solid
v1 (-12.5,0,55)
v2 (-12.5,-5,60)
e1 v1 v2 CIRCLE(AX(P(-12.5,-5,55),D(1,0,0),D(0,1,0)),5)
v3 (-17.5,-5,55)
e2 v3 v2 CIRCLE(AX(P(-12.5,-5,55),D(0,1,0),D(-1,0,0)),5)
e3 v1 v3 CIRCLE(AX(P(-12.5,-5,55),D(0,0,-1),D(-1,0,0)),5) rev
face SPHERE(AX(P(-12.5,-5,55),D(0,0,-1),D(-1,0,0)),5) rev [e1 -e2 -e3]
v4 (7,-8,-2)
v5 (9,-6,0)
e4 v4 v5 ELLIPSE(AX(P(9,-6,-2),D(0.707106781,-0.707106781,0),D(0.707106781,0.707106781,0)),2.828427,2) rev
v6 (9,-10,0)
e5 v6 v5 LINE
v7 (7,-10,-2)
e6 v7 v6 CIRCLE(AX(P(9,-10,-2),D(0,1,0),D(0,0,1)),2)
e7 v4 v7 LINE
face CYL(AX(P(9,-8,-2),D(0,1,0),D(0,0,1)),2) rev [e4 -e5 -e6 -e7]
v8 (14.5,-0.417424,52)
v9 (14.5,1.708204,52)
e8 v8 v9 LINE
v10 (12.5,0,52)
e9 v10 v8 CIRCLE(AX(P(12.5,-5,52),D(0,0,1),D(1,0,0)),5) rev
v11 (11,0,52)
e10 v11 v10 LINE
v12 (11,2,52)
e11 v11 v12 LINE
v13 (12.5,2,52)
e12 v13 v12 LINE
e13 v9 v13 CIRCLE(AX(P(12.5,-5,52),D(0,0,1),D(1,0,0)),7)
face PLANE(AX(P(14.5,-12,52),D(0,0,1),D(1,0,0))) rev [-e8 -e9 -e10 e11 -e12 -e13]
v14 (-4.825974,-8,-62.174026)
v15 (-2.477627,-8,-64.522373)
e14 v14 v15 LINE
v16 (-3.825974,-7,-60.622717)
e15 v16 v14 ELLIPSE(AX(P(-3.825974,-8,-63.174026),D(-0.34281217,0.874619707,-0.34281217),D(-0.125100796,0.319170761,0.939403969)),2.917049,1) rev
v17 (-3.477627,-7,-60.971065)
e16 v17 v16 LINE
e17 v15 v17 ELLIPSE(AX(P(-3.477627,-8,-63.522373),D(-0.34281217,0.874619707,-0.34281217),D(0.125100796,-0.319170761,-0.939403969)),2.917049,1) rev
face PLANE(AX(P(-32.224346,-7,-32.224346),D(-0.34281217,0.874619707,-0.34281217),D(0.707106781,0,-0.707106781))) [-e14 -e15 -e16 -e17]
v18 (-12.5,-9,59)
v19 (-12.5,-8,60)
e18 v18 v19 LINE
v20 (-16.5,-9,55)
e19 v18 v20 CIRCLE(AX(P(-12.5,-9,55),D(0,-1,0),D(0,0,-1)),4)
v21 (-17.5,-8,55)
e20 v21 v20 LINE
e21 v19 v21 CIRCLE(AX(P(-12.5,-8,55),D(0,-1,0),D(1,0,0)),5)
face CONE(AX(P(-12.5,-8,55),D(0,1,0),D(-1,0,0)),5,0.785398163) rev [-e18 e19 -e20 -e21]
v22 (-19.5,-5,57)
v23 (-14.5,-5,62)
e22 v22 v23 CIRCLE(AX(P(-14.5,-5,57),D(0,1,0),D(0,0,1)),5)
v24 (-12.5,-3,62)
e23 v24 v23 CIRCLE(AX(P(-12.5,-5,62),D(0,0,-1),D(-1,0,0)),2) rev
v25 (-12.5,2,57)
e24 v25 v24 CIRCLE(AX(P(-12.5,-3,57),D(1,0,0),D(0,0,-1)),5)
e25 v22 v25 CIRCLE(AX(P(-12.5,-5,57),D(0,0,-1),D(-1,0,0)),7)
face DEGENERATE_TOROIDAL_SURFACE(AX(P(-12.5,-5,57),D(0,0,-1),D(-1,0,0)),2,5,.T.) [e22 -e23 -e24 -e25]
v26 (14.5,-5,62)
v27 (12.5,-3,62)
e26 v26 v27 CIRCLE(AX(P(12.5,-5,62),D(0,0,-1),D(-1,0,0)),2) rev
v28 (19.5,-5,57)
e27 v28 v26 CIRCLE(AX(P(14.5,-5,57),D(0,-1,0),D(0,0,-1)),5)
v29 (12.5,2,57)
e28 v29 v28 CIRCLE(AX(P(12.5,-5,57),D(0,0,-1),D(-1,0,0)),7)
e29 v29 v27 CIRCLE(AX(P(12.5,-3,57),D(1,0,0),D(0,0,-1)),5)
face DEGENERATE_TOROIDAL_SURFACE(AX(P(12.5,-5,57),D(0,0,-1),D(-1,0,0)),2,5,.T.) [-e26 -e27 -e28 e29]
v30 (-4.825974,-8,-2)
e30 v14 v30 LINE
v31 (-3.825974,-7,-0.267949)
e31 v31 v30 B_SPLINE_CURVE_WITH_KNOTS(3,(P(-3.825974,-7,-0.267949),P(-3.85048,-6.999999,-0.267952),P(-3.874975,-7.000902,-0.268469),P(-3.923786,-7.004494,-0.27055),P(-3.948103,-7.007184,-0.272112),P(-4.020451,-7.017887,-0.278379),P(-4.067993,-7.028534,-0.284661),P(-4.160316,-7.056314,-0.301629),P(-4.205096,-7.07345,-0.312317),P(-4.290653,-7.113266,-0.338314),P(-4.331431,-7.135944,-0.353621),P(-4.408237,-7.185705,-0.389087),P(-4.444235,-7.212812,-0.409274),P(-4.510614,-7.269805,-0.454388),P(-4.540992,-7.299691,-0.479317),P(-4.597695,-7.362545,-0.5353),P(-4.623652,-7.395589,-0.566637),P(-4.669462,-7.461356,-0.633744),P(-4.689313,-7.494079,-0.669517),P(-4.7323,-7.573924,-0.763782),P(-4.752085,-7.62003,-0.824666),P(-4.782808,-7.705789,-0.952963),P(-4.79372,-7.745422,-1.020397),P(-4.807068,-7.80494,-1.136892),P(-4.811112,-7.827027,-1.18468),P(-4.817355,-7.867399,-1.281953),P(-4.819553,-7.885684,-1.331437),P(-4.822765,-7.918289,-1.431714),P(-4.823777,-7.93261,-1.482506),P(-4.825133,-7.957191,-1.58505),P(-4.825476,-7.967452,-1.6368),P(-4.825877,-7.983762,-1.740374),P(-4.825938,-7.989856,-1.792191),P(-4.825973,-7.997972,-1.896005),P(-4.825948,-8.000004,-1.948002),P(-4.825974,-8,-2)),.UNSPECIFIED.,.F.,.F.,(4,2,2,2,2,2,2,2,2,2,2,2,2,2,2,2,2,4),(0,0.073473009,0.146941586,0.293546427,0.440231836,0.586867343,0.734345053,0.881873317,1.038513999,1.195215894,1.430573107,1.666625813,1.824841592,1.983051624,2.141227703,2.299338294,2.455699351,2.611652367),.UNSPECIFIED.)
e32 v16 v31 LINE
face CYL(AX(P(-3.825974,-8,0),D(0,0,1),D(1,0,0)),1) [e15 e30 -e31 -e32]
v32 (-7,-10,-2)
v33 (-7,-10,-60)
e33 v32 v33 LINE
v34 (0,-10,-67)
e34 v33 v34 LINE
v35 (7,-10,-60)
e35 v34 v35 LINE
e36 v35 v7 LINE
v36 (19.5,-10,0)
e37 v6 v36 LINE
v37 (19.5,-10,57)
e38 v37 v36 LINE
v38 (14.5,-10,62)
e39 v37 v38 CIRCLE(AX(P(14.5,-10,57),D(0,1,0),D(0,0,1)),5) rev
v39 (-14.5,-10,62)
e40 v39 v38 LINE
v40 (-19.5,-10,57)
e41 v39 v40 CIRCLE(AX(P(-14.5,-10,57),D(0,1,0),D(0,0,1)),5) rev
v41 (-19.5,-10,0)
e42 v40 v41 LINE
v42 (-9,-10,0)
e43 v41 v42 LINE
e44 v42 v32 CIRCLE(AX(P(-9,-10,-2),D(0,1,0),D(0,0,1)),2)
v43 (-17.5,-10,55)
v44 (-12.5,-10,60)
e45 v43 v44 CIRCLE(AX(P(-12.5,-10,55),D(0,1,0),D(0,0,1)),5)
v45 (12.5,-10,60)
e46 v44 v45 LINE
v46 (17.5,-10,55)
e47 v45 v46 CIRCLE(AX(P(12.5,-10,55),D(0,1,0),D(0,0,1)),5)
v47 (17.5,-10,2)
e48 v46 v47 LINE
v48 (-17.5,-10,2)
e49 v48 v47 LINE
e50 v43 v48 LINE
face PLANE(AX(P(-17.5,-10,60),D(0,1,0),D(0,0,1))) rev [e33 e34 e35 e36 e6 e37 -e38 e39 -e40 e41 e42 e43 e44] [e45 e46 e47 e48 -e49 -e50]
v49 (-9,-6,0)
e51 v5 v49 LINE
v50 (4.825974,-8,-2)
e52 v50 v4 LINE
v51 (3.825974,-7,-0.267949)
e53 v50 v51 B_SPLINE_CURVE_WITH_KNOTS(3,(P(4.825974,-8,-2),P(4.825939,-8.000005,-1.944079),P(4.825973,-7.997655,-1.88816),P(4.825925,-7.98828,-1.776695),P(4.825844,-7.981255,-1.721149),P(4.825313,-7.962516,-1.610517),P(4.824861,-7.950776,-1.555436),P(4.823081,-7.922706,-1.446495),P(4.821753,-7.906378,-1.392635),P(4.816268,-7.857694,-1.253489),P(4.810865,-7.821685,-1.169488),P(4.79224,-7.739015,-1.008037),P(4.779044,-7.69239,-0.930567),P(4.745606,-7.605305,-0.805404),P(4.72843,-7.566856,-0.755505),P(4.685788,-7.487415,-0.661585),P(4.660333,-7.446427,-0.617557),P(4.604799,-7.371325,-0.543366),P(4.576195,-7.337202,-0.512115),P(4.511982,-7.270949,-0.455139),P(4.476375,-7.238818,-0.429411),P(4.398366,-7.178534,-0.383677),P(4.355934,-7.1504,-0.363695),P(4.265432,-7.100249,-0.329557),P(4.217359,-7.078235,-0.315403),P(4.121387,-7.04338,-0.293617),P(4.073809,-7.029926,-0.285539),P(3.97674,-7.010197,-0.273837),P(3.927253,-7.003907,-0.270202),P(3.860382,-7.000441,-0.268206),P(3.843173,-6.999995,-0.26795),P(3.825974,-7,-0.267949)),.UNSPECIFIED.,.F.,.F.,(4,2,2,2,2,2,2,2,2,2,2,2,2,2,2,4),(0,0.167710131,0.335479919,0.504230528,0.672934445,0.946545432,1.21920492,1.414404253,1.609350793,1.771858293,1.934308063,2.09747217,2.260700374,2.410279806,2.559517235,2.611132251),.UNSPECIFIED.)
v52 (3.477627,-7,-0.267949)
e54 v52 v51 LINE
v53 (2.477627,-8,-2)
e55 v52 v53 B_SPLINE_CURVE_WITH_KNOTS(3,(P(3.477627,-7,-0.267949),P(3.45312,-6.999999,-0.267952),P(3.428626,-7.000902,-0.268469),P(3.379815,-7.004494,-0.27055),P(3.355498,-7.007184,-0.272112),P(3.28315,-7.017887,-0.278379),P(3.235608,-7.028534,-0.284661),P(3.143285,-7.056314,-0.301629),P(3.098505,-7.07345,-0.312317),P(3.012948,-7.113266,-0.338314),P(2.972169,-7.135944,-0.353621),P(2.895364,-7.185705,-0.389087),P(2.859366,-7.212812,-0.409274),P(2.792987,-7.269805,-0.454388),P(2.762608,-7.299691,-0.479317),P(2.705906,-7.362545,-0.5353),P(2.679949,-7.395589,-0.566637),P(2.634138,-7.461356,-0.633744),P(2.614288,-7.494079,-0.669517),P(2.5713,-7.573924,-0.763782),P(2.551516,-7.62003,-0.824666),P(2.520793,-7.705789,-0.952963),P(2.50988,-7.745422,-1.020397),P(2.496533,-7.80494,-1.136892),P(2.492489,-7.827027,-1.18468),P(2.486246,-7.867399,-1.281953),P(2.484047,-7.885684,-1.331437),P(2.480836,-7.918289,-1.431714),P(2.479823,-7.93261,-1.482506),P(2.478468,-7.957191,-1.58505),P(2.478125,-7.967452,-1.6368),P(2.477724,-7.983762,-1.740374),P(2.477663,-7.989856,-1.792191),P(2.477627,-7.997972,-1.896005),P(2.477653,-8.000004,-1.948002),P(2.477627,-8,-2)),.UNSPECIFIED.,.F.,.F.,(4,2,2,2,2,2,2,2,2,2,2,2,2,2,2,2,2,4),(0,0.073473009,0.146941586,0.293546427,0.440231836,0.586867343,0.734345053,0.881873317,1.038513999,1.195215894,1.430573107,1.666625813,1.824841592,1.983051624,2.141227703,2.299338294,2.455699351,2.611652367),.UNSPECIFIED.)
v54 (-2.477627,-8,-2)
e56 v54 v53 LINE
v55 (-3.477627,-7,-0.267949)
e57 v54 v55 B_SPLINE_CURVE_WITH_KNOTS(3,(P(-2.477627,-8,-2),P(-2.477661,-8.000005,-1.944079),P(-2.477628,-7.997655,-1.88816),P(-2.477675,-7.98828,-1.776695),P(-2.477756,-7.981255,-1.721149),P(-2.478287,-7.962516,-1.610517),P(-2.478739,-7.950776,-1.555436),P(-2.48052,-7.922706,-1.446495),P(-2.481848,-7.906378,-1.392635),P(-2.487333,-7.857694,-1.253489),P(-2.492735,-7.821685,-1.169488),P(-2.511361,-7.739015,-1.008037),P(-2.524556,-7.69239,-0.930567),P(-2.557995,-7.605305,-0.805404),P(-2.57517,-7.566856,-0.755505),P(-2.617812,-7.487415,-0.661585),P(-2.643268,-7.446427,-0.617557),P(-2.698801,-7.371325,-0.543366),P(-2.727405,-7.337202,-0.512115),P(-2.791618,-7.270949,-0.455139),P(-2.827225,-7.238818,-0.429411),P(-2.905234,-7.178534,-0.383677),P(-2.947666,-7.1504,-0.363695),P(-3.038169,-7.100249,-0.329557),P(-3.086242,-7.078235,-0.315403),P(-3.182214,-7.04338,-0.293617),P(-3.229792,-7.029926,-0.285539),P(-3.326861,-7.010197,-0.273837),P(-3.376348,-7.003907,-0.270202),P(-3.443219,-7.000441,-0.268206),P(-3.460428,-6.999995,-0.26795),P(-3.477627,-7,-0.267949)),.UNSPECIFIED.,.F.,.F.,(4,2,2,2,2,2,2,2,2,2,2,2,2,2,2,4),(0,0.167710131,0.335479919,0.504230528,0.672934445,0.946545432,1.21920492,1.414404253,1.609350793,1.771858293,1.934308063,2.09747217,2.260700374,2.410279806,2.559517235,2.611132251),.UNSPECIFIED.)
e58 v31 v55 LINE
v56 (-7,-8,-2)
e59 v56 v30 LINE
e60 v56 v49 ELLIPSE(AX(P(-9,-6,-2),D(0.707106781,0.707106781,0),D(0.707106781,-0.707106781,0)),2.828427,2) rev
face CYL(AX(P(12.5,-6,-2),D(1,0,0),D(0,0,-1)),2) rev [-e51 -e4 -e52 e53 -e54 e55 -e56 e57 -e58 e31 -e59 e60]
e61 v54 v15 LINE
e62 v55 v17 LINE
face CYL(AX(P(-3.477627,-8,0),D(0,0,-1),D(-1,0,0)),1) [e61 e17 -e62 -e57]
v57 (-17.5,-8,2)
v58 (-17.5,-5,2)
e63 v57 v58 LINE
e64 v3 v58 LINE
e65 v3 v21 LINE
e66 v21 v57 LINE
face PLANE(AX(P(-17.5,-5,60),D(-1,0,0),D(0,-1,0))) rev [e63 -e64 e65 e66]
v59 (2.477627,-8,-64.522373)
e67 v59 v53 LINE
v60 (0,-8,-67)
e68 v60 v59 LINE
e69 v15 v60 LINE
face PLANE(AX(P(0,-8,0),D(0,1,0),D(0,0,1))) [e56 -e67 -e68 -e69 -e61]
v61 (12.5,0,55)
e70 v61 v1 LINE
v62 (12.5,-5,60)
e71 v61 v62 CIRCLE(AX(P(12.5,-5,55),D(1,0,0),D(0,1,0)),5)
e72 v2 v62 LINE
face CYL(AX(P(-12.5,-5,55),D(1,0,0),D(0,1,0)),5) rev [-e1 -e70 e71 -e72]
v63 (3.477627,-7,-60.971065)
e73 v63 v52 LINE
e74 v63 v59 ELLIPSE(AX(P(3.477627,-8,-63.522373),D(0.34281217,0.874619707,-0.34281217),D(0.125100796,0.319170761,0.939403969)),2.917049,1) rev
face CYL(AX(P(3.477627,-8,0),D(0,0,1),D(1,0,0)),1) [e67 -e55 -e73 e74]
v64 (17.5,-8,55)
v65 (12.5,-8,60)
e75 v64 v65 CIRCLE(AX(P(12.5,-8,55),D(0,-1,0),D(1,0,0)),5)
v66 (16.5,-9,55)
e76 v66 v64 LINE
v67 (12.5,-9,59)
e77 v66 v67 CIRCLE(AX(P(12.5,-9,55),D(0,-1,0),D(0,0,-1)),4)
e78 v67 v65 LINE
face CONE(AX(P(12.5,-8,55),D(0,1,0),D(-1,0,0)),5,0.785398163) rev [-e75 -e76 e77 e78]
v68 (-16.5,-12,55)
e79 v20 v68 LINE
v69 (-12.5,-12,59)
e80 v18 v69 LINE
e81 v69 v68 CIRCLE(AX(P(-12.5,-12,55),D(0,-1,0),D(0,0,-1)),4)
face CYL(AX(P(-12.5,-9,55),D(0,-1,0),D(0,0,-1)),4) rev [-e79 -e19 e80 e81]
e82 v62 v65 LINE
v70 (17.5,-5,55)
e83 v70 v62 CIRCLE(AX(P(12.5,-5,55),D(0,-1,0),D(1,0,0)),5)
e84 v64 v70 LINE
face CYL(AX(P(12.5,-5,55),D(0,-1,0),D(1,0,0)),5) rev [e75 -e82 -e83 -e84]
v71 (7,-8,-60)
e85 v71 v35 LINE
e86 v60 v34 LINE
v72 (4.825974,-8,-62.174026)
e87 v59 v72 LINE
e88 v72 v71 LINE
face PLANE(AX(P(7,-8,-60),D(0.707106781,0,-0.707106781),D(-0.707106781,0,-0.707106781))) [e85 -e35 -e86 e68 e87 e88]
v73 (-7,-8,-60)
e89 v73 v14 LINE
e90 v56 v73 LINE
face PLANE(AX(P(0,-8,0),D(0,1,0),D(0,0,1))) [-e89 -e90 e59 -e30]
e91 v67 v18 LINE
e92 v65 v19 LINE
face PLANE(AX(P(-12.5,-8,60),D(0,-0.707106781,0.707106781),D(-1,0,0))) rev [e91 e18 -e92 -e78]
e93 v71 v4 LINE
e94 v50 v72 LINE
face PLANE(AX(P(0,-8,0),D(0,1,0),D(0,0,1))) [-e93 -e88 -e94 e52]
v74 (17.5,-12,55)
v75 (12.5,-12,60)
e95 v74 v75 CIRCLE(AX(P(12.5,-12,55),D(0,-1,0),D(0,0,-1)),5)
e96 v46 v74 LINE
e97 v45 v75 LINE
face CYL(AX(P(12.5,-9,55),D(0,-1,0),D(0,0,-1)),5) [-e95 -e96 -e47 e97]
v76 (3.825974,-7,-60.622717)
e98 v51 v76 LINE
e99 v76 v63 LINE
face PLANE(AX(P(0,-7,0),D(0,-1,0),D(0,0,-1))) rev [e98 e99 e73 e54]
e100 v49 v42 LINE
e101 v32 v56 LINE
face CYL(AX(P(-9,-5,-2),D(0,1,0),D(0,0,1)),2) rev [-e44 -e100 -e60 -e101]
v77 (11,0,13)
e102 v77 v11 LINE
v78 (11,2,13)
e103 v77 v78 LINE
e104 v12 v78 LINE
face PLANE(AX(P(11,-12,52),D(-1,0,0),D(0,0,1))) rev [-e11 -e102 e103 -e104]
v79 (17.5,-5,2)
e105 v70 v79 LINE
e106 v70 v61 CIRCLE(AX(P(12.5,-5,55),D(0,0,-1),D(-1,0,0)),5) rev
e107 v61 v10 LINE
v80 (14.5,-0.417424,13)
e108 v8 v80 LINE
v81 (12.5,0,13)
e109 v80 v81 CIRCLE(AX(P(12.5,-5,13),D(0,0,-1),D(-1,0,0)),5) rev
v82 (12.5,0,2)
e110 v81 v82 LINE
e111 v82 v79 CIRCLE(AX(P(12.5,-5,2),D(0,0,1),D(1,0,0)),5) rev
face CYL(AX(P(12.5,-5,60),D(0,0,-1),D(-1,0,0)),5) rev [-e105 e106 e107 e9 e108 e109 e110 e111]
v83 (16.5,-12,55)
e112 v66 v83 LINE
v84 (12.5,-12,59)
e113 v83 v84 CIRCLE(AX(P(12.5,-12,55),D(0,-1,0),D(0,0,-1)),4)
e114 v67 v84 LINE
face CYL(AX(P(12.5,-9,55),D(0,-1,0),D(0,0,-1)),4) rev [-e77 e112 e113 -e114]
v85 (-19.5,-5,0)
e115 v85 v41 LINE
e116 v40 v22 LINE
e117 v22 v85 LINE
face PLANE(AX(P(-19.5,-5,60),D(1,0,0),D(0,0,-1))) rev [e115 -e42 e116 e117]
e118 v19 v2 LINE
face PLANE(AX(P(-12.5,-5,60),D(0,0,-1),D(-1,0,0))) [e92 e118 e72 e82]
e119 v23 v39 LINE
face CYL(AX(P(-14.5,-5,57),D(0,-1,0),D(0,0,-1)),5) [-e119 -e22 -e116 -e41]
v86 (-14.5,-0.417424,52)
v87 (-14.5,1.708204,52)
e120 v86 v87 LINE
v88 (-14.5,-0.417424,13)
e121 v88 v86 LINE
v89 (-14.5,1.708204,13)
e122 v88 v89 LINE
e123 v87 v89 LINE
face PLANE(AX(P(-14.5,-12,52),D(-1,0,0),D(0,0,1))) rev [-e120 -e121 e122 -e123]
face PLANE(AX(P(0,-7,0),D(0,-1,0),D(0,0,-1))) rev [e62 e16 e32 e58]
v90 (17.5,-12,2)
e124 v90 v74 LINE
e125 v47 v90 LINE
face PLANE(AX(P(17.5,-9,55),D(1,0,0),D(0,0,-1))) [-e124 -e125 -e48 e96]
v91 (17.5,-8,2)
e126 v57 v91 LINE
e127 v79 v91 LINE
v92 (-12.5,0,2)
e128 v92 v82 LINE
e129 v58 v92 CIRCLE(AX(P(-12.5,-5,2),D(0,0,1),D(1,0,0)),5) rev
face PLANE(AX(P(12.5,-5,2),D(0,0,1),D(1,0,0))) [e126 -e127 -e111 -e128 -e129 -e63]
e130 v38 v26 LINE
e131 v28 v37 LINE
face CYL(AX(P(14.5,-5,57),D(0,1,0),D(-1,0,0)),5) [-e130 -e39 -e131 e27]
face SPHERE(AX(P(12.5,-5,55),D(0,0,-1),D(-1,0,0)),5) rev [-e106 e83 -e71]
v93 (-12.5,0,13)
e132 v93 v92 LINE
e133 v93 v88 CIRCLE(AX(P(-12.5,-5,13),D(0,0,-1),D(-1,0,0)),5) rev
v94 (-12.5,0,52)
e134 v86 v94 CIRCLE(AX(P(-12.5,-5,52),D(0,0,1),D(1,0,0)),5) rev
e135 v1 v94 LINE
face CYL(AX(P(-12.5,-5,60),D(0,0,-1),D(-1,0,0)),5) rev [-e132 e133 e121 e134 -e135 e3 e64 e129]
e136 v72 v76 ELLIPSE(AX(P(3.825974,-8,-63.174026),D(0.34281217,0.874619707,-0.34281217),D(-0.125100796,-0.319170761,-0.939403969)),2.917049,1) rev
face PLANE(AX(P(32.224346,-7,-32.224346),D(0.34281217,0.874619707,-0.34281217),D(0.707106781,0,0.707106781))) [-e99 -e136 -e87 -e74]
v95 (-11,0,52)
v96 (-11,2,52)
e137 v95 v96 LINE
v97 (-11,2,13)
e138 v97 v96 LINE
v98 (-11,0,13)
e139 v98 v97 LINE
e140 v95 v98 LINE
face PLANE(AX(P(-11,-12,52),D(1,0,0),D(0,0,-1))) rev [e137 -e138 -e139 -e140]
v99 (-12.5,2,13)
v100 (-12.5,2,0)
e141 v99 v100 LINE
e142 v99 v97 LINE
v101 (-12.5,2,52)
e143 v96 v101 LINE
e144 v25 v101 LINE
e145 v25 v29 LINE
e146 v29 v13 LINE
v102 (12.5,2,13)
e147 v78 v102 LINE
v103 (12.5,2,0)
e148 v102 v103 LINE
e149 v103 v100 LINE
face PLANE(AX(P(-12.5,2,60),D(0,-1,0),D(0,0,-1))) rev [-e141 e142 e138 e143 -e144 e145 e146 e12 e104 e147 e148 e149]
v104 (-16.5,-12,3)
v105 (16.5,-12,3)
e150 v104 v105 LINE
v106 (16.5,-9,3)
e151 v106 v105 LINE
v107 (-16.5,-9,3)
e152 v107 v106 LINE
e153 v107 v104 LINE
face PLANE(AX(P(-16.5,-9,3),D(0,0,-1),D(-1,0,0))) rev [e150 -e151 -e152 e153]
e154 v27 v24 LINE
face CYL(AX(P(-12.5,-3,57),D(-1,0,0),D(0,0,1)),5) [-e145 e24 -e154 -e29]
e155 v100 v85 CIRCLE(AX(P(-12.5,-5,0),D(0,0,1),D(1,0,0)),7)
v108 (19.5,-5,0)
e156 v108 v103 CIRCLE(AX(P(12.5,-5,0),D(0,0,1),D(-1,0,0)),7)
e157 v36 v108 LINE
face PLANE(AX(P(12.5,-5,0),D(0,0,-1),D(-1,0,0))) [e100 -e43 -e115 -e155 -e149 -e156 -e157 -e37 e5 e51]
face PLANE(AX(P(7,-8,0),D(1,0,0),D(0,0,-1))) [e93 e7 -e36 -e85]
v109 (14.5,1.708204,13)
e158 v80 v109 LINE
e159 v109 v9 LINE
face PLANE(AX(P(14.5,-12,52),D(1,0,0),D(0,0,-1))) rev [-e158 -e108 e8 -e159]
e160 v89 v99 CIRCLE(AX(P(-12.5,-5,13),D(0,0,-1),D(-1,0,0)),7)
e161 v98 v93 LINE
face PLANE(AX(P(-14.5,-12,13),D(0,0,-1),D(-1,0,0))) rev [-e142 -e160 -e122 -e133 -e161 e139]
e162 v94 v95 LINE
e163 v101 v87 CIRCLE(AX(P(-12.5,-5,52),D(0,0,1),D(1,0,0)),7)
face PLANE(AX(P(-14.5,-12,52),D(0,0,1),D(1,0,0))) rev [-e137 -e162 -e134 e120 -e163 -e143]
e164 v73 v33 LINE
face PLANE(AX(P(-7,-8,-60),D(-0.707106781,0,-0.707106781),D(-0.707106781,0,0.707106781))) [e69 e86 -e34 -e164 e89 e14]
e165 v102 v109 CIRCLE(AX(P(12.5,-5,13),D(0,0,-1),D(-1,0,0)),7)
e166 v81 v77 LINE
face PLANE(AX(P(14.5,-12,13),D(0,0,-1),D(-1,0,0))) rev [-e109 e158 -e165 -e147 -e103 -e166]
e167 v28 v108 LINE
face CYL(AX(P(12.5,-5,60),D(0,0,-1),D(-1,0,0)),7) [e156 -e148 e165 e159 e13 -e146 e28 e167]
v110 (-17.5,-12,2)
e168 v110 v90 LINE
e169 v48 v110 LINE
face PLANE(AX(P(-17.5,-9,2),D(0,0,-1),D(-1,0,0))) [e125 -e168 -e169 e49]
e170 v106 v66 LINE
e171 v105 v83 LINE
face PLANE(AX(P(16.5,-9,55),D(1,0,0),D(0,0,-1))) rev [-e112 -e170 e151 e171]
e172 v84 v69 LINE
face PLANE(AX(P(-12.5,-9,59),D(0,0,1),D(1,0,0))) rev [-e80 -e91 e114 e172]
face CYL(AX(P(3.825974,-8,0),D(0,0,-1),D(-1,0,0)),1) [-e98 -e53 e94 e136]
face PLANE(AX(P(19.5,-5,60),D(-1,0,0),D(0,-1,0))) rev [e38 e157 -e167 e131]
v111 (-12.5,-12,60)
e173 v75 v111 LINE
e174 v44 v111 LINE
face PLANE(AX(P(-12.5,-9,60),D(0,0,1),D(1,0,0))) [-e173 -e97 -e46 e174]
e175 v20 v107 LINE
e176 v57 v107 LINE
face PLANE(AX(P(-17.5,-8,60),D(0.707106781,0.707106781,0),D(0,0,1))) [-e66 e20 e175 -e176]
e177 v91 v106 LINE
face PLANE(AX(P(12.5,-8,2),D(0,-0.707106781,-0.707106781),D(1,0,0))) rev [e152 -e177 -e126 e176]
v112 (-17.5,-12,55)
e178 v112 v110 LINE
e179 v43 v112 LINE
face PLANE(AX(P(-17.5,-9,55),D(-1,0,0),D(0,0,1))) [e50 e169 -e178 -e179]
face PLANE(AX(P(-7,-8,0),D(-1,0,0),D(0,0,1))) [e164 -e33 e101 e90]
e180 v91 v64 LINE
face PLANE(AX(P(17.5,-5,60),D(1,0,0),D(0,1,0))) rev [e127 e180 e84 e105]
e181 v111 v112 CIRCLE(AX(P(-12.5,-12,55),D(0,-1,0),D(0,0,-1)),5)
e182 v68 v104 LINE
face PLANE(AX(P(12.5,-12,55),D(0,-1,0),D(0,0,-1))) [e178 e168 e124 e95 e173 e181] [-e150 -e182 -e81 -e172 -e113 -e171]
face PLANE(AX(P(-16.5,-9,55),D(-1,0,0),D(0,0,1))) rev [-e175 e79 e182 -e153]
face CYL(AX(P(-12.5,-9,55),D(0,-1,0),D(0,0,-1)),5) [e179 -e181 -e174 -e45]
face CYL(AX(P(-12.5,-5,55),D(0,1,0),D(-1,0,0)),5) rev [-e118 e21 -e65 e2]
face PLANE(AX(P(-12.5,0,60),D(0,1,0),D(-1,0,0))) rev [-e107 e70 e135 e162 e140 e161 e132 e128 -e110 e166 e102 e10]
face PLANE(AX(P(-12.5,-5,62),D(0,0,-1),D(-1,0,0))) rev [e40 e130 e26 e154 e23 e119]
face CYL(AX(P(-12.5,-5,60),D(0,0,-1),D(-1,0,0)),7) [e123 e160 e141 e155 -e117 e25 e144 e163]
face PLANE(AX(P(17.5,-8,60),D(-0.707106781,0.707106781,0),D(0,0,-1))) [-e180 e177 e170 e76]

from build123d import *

# Parameters (mm, degrees)
BOSS_EXTRUDE1_DEPTH      = 60
BOSS_EXTRUDE2_DEPTH      = 2
BOSS_EXTRUDE3_START      = 60
BOSS_EXTRUDE3_DEPTH      = 2
FILLET1_R                = 5
BOSS_EXTRUDE4_DEPTH      = 2
FILLET2_R                = 2
BOSS_EXTRUDE5_DEPTH      = 2
BOSS_EXTRUDE5_DEPTH_BACK = 1
CHAMFER3_SIZE            = 1
BOSS_EXTRUDE6_DEPTH      = 1
FILLET3_R                = 1
CHAMFER4_SIZE            = 1
CHAMFER4_SIZE_2          = 1.804047755
CUT_EXTRUDE1_DEPTH       = 72.17056976
CUT_EXTRUDE1_DEPTH_BACK  = 72.17056976
SKETCH6_W                = 3.5
SKETCH6_H                = 39


# Some blends are built 0.0001 mm under size
with BuildPart() as part:
    # Sketch1 → Boss-Extrude1 (new body)
    with BuildSketch(Plane.XY):
        with BuildLine():
            Line((-12.5, 0), (12.5, 0))
            ThreePointArc((12.5, 0), (16.035533906, -1.464466094), (17.5, -5))
            Line((17.5, -5), (17.5, -10))
            Line((17.5, -10), (19.5, -10))
            Line((19.5, -10), (19.5, -5))
            ThreePointArc((19.5, -5), (17.449747468, -0.050252532), (12.5, 2))
            Line((12.5, 2), (-12.5, 2))
            ThreePointArc((-12.5, 2), (-17.449747468, -0.050252532), (-19.5, -5))
            Line((-19.5, -5), (-19.5, -10))
            Line((-19.5, -10), (-17.5, -10))
            Line((-17.5, -10), (-17.5, -5))
            ThreePointArc((-17.5, -5), (-16.035533906, -1.464466094), (-12.5, 0))
        make_face()
    extrude(amount=BOSS_EXTRUDE1_DEPTH)

    # Sketch2 → Boss-Extrude2 (add)
    with BuildSketch(Plane.XY):
        with BuildLine():
            Line((19.5, -10), (19.5, -5))
            ThreePointArc((19.5, -5), (17.449747468, -0.050252532), (12.5, 2))
            Line((12.5, 2), (-12.5, 2))
            ThreePointArc((-12.5, 2), (-17.449747468, -0.050252532), (-19.5, -5))
            Line((-19.5, -5), (-19.5, -10))
            Line((-19.5, -10), (19.5, -10))
        make_face()
    extrude(amount=BOSS_EXTRUDE2_DEPTH)

    # Sketch2<2> → Boss-Extrude3 (add)
    with BuildSketch(Plane.XY.offset(BOSS_EXTRUDE3_START)):
        with BuildLine():
            Line((19.5, -10), (19.5, -5))
            ThreePointArc((19.5, -5), (17.449747468, -0.050252532), (12.5, 2))
            Line((12.5, 2), (-12.5, 2))
            ThreePointArc((-12.5, 2), (-17.449747468, -0.050252532), (-19.5, -5))
            Line((-19.5, -5), (-19.5, -10))
            Line((-19.5, -10), (19.5, -10))
        make_face()
    extrude(amount=BOSS_EXTRUDE3_DEPTH)

    # Fillet1
    fillet1_edges = [part.edges().sort_by_distance(p)[0] for p in [
        (-17.5, -7.5, 60),
        (-16.035533906, -1.464466094, 60),
        (0, 0, 60),
        (16.035533906, -1.464466094, 60),
        (-17.449747468, -0.050252532, 62),
        (17.449747468, -0.050252532, 62),
        (-19.5, -7.5, 62),
        (19.5, -7.5, 62),
        (0, 2, 62),
        (17.5, -7.5, 60),
    ]]
    fillet(fillet1_edges, radius=FILLET1_R)

    # Sketch3 → Boss-Extrude4 (add)
    with BuildSketch(Plane.XZ.offset(10)):
        Polygon((-7, 0), (-7, -60), (0, -67), (7, -60), (7, 0), align=None)
    extrude(amount=-BOSS_EXTRUDE4_DEPTH)

    # Fillet2
    fillet2_edges = [part.edges().sort_by_distance(p)[0] for p in [
        (0, -8, 0),
        (-7, -9, 0),
        (7, -9, 0),
    ]]
    fillet(fillet2_edges, radius=FILLET2_R)

    # Sketch4 → Boss-Extrude5 (add, two sides: drawn at the far end of the back side and taken through both)
    with BuildSketch(Plane.XZ.offset(10).offset(-BOSS_EXTRUDE5_DEPTH_BACK)):
        with BuildLine():
            Line((-17.5, 2), (17.5, 2))
            Line((17.5, 2), (17.5, 55))
            ThreePointArc((17.5, 55), (16.035533906, 58.535533906), (12.5, 60))
            Line((12.5, 60), (-12.5, 60))
            ThreePointArc((-12.5, 60), (-16.035533906, 58.535533906), (-17.5, 55))
            Line((-17.5, 55), (-17.5, 2))
        make_face()
        with BuildLine():
            Line((-16.5, 3), (16.5, 3))
            Line((16.5, 3), (16.5, 55))
            ThreePointArc((16.5, 55), (15.328427125, 57.828427125), (12.5, 59))
            Line((12.5, 59), (-12.5, 59))
            ThreePointArc((-12.5, 59), (-15.328427125, 57.828427125), (-16.5, 55))
            Line((-16.5, 55), (-16.5, 3))
        make_face(mode=Mode.SUBTRACT)
    extrude(amount=BOSS_EXTRUDE5_DEPTH + BOSS_EXTRUDE5_DEPTH_BACK)

    # Chamfer3
    chamfer3_edges = [part.edges().sort_by_distance(p)[0] for p in [
        (-17.5, -9, 28.5),
        (-16.035533906, -9, 58.535533906),
        (0, -9, 60),
        (16.035533906, -9, 58.535533906),
        (17.5, -9, 28.5),
        (0, -9, 2),
    ]]
    chamfer(chamfer3_edges, length=CHAMFER3_SIZE - 0.0001)  # a hair under: the kernel refuses the full size

    # Sketch5 → Boss-Extrude6 (add)
    with BuildSketch(Plane(origin=(0, -8, 0), x_dir=(1, 0, 0), z_dir=(0, 1, 0))):
        Polygon((-4.825973992, 0), (-2.477626604, 0), (-2.477626604, 64.522373396), (-4.825973992, 62.174026008), align=None)
        Polygon((4.825973992, 0), (4.825973992, 62.174026008), (2.477626604, 64.522373396), (2.477626604, 0), align=None)
    extrude(amount=BOSS_EXTRUDE6_DEPTH)

    # Fillet3
    fillet3_edges = [part.edges().sort_by_distance(p)[0] for p in [
        (4.825973992, -7, -31.2209876),
        (2.477626604, -7, -32.395161294),
        (-2.477626604, -7, -32.395161294),
        (-4.825973992, -7, -31.2209876),
    ]]
    fillet(fillet3_edges, radius=FILLET3_R - 0.0001)  # a hair under: the kernel refuses the full size

    # Chamfer4
    # the kernel refuses this chamfer: 1.804047755, 1 mm, written as the material it takes off along each edge
    with BuildSketch(Plane(origin=(-0.176240013, -7, -66.823759987), x_dir=(-0.04304000526140607, -0.9981458389905735, -0.043040005261406056), z_dir=(-0.7071067811865475, 0, 0.7071067811865477)), Plane(origin=(7.127360583, -7, -59.872639417), x_dir=(0.043040005261406056, -0.9981458389905735, -0.04304000526140604), z_dir=(-0.7071067811865475, 0, -0.7071067811865477))) as chamfer4_piece_1:
        Polygon((CHAMFER4_SIZE * 0.998145838991, CHAMFER4_SIZE * 0.0608677591653), (-CHAMFER4_SIZE_2 * 0.0608677591744, CHAMFER4_SIZE_2 * 0.998145839141), (0, 0), align=None)
    extrude(amount=9.830368984, mode=Mode.SUBTRACT)

    # Sketch6 → Cut-Extrude1 (cut, two sides: drawn at the far end of the back side and taken through both)
    with BuildSketch(Plane(origin=(0, 2, 0), x_dir=(1, 0, 0), z_dir=(0, 1, 0)).offset(-CUT_EXTRUDE1_DEPTH_BACK)):
        with Locations((12.75, -32.5)):
            Rectangle(SKETCH6_W, SKETCH6_H)
        with Locations((-12.75, -32.5)):
            Rectangle(SKETCH6_W, SKETCH6_H)
    extrude(amount=CUT_EXTRUDE1_DEPTH + CUT_EXTRUDE1_DEPTH_BACK, mode=Mode.SUBTRACT)


solid = part.part
